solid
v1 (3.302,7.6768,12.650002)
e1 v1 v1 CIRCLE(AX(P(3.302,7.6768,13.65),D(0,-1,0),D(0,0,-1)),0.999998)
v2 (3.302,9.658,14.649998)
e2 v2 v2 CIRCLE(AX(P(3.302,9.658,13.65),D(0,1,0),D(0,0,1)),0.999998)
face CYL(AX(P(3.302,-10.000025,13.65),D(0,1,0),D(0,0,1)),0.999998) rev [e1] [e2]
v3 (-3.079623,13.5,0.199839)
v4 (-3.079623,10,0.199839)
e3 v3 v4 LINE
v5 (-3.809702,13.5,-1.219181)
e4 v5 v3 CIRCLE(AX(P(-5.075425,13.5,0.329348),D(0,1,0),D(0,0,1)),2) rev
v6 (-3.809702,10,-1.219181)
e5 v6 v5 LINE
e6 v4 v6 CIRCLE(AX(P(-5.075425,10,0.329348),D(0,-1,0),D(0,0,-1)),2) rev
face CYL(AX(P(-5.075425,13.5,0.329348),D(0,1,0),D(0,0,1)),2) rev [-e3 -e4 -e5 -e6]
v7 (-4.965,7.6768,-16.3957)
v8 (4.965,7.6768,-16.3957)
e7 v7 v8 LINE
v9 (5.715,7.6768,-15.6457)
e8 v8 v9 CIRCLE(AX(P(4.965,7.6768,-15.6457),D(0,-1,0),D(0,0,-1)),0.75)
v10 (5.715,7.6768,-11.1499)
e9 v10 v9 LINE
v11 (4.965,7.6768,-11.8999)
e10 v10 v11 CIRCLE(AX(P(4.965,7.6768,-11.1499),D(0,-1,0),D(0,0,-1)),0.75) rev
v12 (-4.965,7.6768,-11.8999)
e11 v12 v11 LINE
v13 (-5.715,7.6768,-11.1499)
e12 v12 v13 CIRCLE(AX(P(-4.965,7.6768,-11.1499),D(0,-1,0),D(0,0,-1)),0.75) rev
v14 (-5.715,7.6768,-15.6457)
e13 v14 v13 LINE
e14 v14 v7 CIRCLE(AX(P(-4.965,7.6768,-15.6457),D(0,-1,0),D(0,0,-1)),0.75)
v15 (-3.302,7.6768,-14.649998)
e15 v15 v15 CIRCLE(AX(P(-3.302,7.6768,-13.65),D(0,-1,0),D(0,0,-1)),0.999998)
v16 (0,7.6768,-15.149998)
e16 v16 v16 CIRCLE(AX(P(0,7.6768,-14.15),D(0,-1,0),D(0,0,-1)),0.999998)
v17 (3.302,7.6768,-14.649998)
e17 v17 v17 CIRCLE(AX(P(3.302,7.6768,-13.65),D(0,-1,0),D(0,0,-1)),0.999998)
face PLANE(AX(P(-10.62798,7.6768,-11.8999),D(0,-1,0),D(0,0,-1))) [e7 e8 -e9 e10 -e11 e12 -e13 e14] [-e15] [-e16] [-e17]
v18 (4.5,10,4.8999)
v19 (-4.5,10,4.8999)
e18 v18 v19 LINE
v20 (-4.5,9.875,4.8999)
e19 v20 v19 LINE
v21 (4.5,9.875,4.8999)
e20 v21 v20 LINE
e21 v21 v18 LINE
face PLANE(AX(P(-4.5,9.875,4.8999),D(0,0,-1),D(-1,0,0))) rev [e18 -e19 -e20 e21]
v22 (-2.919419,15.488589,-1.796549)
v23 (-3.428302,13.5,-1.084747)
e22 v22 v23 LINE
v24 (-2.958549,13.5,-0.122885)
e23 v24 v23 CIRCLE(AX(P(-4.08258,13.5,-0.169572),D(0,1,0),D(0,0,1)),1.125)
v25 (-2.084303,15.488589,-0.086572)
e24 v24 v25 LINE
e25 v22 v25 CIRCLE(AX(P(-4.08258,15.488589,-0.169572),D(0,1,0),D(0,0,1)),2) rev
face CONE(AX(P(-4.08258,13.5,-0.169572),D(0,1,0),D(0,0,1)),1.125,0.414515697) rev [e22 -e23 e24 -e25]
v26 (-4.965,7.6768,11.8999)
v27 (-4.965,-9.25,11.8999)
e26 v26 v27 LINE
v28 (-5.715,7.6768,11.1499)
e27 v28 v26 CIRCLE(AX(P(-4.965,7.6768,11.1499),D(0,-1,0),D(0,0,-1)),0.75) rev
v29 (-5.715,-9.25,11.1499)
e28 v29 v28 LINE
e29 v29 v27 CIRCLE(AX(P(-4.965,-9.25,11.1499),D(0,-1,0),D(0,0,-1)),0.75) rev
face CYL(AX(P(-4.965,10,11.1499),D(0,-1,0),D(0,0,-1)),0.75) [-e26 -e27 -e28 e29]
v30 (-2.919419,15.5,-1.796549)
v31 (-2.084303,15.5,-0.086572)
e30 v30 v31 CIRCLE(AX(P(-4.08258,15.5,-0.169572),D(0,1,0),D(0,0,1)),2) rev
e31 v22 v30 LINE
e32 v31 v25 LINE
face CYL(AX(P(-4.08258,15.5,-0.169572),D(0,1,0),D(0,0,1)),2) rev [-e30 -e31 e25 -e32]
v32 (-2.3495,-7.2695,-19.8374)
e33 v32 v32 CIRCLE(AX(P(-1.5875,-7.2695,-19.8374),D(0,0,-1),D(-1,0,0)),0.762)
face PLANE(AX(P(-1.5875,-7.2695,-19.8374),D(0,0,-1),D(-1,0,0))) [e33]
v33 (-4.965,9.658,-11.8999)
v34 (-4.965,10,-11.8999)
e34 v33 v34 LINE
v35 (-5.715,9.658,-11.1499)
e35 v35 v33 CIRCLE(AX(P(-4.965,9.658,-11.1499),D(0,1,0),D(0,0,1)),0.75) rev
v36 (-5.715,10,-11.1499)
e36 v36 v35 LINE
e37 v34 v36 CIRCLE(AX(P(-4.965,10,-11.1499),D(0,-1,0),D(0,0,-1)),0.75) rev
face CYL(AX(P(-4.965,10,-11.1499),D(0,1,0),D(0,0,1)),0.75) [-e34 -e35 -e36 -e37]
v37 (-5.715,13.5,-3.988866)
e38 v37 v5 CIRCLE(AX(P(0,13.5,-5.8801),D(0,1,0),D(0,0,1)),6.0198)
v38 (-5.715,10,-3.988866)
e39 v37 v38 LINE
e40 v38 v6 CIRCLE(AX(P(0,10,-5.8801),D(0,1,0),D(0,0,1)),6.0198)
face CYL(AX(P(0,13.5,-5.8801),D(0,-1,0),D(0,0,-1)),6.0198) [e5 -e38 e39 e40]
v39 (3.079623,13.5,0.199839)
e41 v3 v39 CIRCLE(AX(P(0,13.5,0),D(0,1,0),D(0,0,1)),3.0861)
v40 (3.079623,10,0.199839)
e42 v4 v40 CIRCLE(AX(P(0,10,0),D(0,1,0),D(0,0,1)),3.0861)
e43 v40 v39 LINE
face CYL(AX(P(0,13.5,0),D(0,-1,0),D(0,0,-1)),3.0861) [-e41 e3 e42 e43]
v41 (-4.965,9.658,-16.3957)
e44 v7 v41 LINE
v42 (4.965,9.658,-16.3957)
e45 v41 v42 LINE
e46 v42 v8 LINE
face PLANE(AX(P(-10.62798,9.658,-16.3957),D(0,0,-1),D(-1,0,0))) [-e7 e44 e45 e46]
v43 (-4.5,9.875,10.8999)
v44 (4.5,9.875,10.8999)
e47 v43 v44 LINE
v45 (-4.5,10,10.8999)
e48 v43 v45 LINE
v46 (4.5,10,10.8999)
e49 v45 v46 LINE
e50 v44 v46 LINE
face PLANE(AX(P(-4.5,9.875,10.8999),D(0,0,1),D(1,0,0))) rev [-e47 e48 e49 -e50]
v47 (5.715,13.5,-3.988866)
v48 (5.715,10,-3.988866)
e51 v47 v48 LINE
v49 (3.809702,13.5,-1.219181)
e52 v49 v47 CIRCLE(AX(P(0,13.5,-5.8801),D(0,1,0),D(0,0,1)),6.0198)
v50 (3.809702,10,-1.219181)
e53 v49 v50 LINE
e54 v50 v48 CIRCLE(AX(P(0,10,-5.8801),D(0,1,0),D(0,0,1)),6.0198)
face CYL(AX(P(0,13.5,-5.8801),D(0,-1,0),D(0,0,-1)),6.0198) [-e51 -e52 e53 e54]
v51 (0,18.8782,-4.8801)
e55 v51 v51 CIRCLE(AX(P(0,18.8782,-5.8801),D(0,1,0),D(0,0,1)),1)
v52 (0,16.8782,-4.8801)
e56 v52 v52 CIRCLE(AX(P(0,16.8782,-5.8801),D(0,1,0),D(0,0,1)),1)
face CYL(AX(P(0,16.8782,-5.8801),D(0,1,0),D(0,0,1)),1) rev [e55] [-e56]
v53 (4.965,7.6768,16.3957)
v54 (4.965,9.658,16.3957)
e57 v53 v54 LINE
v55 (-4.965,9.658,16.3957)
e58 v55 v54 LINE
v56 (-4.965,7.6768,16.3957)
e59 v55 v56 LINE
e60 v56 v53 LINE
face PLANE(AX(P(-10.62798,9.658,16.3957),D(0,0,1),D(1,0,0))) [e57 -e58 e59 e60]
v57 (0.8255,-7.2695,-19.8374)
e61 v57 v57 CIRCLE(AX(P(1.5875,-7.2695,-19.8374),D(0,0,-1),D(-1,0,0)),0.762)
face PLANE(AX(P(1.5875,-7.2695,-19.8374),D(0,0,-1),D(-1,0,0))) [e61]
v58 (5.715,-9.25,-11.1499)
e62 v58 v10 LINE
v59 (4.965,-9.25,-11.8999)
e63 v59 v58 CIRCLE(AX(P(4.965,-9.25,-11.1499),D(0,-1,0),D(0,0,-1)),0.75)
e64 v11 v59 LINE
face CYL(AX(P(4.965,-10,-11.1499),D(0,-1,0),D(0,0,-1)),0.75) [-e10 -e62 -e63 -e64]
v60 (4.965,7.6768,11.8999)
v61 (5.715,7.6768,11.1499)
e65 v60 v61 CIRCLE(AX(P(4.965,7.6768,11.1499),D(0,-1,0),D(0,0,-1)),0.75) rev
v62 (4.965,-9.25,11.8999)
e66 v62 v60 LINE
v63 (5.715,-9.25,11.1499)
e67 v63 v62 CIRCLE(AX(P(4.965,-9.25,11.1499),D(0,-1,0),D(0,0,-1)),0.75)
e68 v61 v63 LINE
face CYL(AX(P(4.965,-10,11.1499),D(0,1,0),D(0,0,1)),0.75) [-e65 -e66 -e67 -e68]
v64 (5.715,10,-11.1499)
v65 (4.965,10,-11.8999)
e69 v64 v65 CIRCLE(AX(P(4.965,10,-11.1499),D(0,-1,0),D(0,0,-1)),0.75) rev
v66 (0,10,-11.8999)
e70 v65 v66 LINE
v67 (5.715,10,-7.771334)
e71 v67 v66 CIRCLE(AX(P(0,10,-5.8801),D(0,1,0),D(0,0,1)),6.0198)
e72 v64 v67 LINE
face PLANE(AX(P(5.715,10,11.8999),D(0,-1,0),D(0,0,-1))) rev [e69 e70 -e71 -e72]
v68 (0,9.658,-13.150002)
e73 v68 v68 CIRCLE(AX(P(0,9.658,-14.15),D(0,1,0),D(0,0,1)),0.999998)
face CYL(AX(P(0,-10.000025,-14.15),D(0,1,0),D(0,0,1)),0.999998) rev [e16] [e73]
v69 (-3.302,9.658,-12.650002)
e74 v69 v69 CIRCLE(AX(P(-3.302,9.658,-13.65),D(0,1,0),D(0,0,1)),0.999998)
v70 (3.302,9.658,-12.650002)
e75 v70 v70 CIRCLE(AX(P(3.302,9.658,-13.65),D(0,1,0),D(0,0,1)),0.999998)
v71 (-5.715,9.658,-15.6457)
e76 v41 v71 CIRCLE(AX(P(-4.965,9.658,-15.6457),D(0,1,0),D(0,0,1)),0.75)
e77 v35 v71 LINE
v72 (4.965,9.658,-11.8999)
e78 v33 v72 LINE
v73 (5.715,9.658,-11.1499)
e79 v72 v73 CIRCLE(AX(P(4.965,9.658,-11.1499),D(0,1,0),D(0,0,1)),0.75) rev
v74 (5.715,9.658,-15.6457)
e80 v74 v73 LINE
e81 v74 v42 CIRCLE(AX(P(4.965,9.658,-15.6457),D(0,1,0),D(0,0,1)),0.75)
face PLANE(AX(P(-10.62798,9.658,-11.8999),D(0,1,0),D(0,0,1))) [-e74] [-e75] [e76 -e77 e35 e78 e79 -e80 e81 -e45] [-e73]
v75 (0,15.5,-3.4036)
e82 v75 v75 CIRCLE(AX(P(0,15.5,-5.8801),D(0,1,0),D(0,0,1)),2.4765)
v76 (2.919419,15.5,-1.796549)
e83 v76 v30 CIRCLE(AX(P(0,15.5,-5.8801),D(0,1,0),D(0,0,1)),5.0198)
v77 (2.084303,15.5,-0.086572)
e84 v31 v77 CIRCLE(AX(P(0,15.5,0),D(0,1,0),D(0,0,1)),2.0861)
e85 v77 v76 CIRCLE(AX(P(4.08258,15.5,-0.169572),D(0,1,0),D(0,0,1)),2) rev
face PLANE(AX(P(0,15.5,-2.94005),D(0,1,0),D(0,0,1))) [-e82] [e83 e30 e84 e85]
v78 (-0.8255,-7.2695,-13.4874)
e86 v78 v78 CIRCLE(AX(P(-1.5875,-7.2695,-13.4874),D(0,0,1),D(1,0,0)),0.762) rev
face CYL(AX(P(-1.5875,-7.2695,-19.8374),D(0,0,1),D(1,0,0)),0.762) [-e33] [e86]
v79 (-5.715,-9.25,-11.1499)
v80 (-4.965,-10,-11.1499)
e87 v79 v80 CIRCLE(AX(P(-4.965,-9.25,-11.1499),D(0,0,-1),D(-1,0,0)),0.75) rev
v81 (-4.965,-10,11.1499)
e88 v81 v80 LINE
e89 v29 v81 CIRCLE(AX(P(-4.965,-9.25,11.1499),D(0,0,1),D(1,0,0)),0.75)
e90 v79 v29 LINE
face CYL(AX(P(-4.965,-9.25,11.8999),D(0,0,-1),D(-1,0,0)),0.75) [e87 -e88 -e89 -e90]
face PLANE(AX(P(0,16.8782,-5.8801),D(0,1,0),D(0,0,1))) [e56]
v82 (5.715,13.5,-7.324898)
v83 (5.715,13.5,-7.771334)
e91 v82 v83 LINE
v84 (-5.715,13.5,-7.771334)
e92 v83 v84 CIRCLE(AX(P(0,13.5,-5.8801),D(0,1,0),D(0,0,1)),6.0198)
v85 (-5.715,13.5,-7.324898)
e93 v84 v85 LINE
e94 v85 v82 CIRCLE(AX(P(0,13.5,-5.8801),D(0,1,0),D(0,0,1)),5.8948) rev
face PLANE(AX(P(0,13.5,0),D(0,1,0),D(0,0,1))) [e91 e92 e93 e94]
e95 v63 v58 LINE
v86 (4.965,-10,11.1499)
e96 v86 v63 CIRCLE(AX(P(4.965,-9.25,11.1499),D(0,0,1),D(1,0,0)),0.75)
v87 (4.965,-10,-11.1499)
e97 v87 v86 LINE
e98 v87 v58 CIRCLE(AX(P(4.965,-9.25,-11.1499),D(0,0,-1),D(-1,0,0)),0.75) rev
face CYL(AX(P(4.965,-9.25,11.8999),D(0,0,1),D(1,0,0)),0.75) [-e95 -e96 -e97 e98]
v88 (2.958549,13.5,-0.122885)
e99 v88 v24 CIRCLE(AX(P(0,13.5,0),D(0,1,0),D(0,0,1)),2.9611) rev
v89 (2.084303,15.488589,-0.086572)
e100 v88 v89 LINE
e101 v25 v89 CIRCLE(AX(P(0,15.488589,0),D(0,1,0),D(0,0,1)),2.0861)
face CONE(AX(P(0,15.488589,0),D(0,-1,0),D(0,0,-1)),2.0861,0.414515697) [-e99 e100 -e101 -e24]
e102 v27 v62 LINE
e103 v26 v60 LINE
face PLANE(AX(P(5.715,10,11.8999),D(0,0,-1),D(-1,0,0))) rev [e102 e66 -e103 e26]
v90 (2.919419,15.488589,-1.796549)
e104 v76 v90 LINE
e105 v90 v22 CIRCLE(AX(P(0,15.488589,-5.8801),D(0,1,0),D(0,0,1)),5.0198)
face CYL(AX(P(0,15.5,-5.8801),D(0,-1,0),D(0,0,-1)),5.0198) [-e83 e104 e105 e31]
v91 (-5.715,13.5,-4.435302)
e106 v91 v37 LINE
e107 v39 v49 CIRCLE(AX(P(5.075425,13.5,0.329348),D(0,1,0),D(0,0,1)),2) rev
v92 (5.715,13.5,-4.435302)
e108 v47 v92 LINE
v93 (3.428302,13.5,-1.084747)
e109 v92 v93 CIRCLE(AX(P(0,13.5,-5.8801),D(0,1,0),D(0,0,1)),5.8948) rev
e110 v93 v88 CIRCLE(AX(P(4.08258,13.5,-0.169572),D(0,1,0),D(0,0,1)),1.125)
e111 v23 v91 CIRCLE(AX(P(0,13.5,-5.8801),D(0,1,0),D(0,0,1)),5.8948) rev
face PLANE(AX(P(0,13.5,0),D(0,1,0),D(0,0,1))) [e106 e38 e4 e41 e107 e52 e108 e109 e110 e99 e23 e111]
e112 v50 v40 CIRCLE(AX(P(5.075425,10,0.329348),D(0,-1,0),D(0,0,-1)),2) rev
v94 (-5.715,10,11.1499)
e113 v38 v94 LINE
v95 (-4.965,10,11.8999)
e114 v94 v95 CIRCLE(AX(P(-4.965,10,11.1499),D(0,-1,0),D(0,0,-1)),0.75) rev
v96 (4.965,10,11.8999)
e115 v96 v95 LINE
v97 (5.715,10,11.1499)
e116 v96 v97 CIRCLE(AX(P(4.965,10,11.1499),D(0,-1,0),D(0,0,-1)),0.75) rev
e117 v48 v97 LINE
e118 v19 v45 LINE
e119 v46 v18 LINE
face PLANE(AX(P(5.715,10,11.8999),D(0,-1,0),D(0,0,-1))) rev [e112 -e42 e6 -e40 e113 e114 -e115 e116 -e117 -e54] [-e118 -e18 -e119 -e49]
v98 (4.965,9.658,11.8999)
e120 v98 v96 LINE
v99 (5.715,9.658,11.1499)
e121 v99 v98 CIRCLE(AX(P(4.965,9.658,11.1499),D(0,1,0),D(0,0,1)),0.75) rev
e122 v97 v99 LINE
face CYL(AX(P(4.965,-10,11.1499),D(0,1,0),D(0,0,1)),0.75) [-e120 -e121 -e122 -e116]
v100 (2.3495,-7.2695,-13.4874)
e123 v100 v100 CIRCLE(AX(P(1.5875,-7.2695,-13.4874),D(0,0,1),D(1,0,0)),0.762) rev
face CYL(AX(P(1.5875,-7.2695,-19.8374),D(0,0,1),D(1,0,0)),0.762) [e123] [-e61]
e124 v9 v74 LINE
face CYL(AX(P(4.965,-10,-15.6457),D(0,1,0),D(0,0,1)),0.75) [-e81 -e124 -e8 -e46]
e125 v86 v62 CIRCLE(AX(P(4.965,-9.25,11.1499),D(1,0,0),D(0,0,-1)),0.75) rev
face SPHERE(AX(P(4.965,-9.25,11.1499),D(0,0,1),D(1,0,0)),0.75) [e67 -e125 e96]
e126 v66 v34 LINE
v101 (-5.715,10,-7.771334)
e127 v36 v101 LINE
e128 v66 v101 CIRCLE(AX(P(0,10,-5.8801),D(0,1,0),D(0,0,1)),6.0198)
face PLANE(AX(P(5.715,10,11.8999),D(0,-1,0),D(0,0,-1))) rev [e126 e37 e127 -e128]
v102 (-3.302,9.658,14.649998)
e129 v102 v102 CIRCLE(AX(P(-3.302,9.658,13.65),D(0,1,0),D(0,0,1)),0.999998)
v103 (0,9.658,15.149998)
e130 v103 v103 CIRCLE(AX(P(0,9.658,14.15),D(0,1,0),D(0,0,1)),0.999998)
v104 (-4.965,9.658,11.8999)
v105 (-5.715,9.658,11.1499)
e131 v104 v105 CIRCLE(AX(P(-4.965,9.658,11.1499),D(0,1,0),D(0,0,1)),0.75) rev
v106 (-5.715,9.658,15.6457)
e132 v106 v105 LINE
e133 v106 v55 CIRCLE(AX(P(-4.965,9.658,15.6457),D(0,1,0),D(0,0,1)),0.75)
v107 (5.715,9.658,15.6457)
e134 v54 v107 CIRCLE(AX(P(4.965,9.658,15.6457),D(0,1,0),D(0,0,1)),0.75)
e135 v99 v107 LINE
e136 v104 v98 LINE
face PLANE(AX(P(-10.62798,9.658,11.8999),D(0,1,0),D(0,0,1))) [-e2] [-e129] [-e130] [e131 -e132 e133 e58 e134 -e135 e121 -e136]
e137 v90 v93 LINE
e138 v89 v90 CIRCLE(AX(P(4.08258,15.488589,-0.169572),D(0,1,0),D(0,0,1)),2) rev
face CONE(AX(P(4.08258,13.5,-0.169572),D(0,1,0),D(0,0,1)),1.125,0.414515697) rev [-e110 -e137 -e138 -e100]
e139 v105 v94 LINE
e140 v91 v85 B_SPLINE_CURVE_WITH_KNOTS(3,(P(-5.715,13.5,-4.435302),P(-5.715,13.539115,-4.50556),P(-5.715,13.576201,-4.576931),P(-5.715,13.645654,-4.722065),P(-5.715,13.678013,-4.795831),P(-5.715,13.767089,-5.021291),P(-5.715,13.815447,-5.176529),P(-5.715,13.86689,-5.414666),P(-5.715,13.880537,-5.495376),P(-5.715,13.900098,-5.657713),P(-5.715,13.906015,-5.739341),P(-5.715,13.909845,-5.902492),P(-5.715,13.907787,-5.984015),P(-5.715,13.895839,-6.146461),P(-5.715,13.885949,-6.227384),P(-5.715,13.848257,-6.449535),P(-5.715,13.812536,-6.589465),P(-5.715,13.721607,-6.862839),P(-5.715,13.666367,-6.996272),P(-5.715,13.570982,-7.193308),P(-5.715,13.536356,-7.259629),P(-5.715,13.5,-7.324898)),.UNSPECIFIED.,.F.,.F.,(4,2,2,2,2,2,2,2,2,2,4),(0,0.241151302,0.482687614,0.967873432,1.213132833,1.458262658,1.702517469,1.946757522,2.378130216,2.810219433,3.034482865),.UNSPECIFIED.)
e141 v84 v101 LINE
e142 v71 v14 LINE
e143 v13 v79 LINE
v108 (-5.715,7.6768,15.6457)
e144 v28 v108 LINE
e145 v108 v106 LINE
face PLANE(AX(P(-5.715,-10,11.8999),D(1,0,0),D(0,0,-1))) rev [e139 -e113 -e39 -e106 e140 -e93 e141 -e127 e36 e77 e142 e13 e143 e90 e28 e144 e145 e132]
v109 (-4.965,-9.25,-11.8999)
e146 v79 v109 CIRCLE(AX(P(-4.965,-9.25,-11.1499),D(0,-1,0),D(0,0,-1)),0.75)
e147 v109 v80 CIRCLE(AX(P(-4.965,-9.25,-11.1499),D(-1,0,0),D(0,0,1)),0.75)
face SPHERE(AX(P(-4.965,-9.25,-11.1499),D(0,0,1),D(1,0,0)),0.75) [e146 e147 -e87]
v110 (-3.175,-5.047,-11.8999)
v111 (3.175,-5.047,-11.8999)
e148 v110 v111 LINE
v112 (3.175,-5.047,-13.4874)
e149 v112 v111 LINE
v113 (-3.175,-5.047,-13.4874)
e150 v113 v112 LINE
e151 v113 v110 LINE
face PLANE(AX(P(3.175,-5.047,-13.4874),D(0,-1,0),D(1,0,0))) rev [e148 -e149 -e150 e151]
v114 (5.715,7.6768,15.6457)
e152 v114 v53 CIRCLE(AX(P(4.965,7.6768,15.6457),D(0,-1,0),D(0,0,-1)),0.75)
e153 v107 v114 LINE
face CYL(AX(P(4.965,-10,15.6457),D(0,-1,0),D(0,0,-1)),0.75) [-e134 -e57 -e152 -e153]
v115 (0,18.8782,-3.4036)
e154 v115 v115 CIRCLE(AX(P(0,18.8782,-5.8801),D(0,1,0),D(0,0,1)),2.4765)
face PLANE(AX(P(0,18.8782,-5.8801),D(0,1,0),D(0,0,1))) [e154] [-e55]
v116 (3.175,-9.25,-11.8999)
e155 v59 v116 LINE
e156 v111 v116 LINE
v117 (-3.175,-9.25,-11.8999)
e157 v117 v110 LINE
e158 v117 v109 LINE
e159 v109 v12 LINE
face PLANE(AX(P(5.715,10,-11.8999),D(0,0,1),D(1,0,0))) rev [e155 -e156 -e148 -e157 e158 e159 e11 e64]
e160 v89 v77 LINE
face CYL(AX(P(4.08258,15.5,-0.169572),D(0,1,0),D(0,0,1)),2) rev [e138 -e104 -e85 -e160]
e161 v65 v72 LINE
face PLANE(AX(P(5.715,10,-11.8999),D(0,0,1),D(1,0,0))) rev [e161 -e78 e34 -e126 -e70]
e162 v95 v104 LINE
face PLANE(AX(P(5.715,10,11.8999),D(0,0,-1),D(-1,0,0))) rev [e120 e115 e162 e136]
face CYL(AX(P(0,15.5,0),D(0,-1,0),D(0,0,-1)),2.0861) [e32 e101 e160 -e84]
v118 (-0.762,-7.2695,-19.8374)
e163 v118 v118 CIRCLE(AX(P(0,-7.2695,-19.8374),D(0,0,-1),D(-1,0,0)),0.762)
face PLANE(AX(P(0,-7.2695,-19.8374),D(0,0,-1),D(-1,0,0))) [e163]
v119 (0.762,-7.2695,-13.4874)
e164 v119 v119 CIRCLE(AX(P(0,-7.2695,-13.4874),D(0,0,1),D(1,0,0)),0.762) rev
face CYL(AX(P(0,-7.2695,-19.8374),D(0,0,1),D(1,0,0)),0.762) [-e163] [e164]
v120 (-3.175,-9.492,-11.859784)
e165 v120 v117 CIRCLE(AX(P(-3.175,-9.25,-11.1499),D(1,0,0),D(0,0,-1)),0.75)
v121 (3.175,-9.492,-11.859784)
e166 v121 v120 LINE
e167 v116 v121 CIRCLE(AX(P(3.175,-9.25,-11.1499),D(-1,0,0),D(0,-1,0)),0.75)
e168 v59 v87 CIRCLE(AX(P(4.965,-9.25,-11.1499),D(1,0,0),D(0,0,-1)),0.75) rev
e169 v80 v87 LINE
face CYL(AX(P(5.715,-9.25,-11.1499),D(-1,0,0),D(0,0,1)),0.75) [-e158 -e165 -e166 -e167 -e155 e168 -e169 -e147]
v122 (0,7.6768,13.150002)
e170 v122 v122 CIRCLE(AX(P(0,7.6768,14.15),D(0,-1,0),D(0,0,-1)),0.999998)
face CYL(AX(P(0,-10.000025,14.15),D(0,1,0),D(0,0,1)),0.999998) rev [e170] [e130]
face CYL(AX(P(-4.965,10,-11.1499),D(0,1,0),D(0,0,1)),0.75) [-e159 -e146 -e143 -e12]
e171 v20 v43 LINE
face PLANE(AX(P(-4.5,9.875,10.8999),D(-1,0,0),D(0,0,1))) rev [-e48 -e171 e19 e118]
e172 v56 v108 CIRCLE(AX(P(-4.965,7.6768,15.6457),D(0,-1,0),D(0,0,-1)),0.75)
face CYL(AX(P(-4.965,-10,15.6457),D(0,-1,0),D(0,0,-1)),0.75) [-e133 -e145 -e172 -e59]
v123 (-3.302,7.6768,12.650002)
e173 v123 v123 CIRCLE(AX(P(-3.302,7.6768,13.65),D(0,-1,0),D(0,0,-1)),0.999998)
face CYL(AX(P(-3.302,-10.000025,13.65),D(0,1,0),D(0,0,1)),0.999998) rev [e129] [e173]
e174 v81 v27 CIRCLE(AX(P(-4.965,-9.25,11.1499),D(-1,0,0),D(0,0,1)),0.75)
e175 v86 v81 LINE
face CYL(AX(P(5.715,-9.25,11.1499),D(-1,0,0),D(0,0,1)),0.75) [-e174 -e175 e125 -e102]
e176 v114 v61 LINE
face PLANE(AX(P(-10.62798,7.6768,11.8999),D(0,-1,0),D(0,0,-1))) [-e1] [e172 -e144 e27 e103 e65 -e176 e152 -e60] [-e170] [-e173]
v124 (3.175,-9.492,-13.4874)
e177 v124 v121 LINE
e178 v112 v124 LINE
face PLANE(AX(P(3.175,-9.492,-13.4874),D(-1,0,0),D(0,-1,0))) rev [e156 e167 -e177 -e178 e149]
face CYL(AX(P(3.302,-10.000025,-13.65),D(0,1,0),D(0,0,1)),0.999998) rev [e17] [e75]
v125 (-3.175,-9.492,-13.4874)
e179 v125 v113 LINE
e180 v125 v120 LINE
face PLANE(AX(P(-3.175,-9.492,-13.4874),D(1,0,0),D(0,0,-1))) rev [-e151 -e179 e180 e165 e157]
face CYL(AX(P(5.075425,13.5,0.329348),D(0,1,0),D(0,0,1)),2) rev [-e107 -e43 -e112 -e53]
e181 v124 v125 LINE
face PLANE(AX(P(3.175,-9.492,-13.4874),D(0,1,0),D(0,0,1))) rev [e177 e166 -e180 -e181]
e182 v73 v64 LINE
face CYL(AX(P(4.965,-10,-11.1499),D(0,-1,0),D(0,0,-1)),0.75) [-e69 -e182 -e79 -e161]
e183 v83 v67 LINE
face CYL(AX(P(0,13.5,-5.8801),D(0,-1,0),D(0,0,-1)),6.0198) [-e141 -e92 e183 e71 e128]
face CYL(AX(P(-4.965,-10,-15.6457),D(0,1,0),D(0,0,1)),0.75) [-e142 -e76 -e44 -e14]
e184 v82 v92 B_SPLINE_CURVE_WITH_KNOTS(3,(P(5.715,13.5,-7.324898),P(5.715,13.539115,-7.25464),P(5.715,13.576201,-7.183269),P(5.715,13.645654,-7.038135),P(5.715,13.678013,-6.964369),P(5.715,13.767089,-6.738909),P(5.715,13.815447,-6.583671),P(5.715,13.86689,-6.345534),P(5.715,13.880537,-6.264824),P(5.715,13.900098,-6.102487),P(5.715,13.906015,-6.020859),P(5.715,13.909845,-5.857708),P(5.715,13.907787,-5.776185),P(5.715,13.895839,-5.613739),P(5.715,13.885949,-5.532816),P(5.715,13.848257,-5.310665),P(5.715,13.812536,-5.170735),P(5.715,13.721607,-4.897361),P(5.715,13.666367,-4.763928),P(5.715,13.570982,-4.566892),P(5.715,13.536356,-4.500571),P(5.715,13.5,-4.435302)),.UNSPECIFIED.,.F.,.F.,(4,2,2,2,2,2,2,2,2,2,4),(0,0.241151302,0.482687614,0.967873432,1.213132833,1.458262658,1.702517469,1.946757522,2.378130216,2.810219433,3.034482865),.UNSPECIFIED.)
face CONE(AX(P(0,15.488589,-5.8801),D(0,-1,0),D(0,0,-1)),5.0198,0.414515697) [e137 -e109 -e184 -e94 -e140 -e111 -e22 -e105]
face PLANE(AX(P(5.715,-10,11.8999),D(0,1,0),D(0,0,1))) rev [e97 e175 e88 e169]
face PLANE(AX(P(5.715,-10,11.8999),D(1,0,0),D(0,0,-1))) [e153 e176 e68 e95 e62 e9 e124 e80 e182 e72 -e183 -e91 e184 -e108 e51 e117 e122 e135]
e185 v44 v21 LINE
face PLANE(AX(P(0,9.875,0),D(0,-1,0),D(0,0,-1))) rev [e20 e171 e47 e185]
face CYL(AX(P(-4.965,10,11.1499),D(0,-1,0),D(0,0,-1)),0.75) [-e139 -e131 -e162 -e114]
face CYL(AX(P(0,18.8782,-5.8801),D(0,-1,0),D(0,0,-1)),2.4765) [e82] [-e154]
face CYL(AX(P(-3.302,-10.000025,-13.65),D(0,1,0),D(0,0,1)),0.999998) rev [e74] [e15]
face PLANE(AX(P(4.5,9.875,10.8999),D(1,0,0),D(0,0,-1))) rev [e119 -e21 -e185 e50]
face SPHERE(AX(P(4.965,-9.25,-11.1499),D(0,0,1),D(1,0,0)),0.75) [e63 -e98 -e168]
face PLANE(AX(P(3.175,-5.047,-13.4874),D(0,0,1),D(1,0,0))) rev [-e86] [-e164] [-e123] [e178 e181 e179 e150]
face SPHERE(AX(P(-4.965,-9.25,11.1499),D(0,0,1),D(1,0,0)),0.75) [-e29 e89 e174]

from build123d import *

# Parameters (mm, degrees)
EXTRUDE1_DEPTH      = 5.715
EXTRUDE1_DEPTH_BACK = 5.715
SKETCH1_W           = 23.7998
SKETCH1_H           = 20
BOSS_EXTRUDE7_DEPTH = 3.5
BOSS_EXTRUDE8_DEPTH = 2
SKETCH3_W           = 4.4958
SKETCH3_H           = 1.9812
EXTRUDE2_DEPTH      = 11.43
SKETCH4_R           = 0.999998
EXTRUDE3_DEPTH      = 27.22817507
SKETCH5_W           = 6.35
SKETCH5_H           = 4.445
BOSS_EXTRUDE1_DEPTH = 1.5875
SKETCH6_R           = 0.762
BOSS_EXTRUDE4_DEPTH = 6.35
SKETCH8_R           = 2.4765
BOSS_EXTRUDE6_DEPTH = 3.3782
SKETCH9_W           = 9
SKETCH9_H           = 6
CUT_EXTRUDE2_DEPTH  = 0.125
SKETCH11_R          = 1
CUT_EXTRUDE3_DEPTH  = 2
FILLET1_R           = 0.75
FILLET2_R           = 2
CHAMFER1_SIZE       = 0.875
CHAMFER1_SIZE_2     = 1.988588769


with BuildPart() as part:
    # Sketch1 → Extrude1 (new, two sides: drawn at the far end of the back side and taken through both)
    with BuildSketch(Plane(origin=(0, 0, 0), x_dir=(0, 0, -1), z_dir=(1, 0, 0)).offset(-EXTRUDE1_DEPTH_BACK)):
        Rectangle(SKETCH1_W, SKETCH1_H)
    extrude(amount=EXTRUDE1_DEPTH + EXTRUDE1_DEPTH_BACK)

    # Sketch2 → Boss-Extrude7 (add)
    with BuildSketch(Plane(origin=(0, 10, 0), x_dir=(-1, 0, 0), z_dir=(0, 1, 0))):
        with BuildLine():
            Line((5.715, -7.771334264), (5.715, -3.988865736))
            ThreePointArc((5.715, -3.988865736), (4.669043342, -2.080359705), (3.012827896, -0.668491793))
            ThreePointArc((3.012827896, -0.668491793), (0, 3.0861), (-3.012827896, -0.668491793))
            ThreePointArc((-3.012827896, -0.668491793), (-4.669043342, -2.080359705), (-5.715, -3.988865736))
            Line((-5.715, -3.988865736), (-5.715, -7.771334264))
            ThreePointArc((-5.715, -7.771334264), (0, -11.8999), (5.715, -7.771334264))
        make_face()
    extrude(amount=BOSS_EXTRUDE7_DEPTH)

    # Sketch10 → Boss-Extrude8 (add)
    with BuildSketch(Plane(origin=(0, 13.5, 0), x_dir=(1, 0, 0), z_dir=(0, 1, 0))):
        with BuildLine():
            ThreePointArc((-1.728861682, 1.167411879), (0, -2.0861), (1.728861682, 1.167411879))
            ThreePointArc((1.728861682, 1.167411879), (0, 10.8999), (-1.728861682, 1.167411879))
        make_face()
    extrude(amount=BOSS_EXTRUDE8_DEPTH)

    # Sketch3 → Extrude2 (add)
    with BuildSketch(Plane(origin=(5.715, 0, 0), x_dir=(0, 0, -1), z_dir=(1, 0, 0))):
        with Locations((-14.1478, 8.6674)):
            Rectangle(SKETCH3_W, SKETCH3_H)
        with Locations((14.1478, 8.6674)):
            Rectangle(SKETCH3_W, SKETCH3_H)
    extrude(amount=-EXTRUDE2_DEPTH)

    # Sketch4 → Extrude3 (cut, through all)
    with BuildSketch(Plane(origin=(0, 9.658, 0), x_dir=(1, 0, 0), z_dir=(0, 1, 0))):
        with Locations(Location((0, 14.15, 0), (0, 0, 270))):
            Circle(SKETCH4_R)
        with Locations(Location((0, -14.15, 0), (0, 0, 270))):
            Circle(SKETCH4_R)
        with Locations(Location((-3.302, 13.65, 0), (0, 0, 270))):
            Circle(SKETCH4_R)
        with Locations(Location((3.302, 13.65, 0), (0, 0, 270))):
            Circle(SKETCH4_R)
        with Locations(Location((3.302, -13.65, 0), (0, 0, 270))):
            Circle(SKETCH4_R)
        with Locations(Location((-3.302, -13.65, 0), (0, 0, 270))):
            Circle(SKETCH4_R)
    extrude(amount=-EXTRUDE3_DEPTH, mode=Mode.SUBTRACT)

    # Sketch5 → Boss-Extrude1 (add)
    with BuildSketch(Plane(origin=(0, 0, -11.8999), x_dir=(-1, 0, 0), z_dir=(0, 0, -1))):
        with Locations((0, -7.2695)):
            Rectangle(SKETCH5_W, SKETCH5_H)
    extrude(amount=BOSS_EXTRUDE1_DEPTH)

    # Sketch6 → Boss-Extrude4 (add)
    with BuildSketch(Plane(origin=(0, 0, -13.4874), x_dir=(-1, 0, 0), z_dir=(0, 0, -1))):
        with Locations(Location((0, -7.2695, 0), (0, 0, 180))):
            Circle(SKETCH6_R)
        with Locations(Location((-1.5875, -7.2695, 0), (0, 0, 180))):
            Circle(SKETCH6_R)
        with Locations(Location((1.5875, -7.2695, 0), (0, 0, 180))):
            Circle(SKETCH6_R)
    extrude(amount=BOSS_EXTRUDE4_DEPTH)

    # Sketch8 → Boss-Extrude6 (add)
    with BuildSketch(Plane(origin=(0, 15.5, 0), x_dir=(1, 0, 0), z_dir=(0, 1, 0))):
        with Locations(Location((0, 5.8801, 0), (0, 0, 270))):
            Circle(SKETCH8_R)
    extrude(amount=BOSS_EXTRUDE6_DEPTH)

    # Sketch9 → Cut-Extrude2 (cut)
    with BuildSketch(Plane(origin=(0, 10, 0), x_dir=(1, 0, 0), z_dir=(0, 1, 0))):
        with Locations((0, -7.8999)):
            Rectangle(SKETCH9_W, SKETCH9_H)
    extrude(amount=-CUT_EXTRUDE2_DEPTH, mode=Mode.SUBTRACT)

    # Sketch11 → Cut-Extrude3 (cut)
    with BuildSketch(Plane(origin=(0, 18.8782, 0), x_dir=(1, 0, 0), z_dir=(0, 1, 0))):
        with Locations(Location((0, 5.8801, 0), (0, 0, 270))):
            Circle(SKETCH11_R)
    extrude(amount=-CUT_EXTRUDE3_DEPTH, mode=Mode.SUBTRACT)

    # Fillet1
    # the kernel refuses this fillet: 0.75 mm, written as the material it takes off along each edge
    with BuildSketch(Plane(origin=(-4.965, -9.25, 11.1499), x_dir=(0, -1, 0), z_dir=(-1, 0, 0))) as fillet1_piece_1_section:
        Polygon((0, 0), (FILLET1_R, 0), (FILLET1_R, FILLET1_R), (0, FILLET1_R), align=None)
    fillet1_piece_1 = extrude(amount=FILLET1_R, mode=Mode.PRIVATE)
    fillet1_piece_1 = fillet1_piece_1 - Plane(origin=(-4.965, -9.25, 11.1499), x_dir=(0, 0.7071067811865475, -0.7071067811865475), z_dir=(-1, 0, 0)) * Sphere(FILLET1_R, mode=Mode.PRIVATE)
    add(fillet1_piece_1, mode=Mode.SUBTRACT)
    with BuildSketch(Plane(origin=(-4.965, -9.25, -11.1499), x_dir=(0, 0, -1), z_dir=(-1, 0, 0))) as fillet1_piece_2_section:
        Polygon((0, 0), (FILLET1_R, 0), (FILLET1_R, FILLET1_R), (0, FILLET1_R), align=None)
    fillet1_piece_2 = extrude(amount=FILLET1_R, mode=Mode.PRIVATE)
    fillet1_piece_2 = fillet1_piece_2 - Plane(origin=(-4.965, -9.25, -11.1499), x_dir=(0, 0.7071067811865475, 0.7071067811865475), z_dir=(-1, 0, 0)) * Sphere(FILLET1_R, mode=Mode.PRIVATE)
    add(fillet1_piece_2, mode=Mode.SUBTRACT)
    with BuildSketch(Plane(origin=(4.965, -9.25, 11.1499), x_dir=(0, -1, 0), z_dir=(1, 0, 0))) as fillet1_piece_3_section:
        Polygon((0, 0), (FILLET1_R, 0), (FILLET1_R, -FILLET1_R), (0, -FILLET1_R), align=None)
    fillet1_piece_3 = extrude(amount=FILLET1_R, mode=Mode.PRIVATE)
    fillet1_piece_3 = fillet1_piece_3 - Plane(origin=(4.965, -9.25, 11.1499), x_dir=(0, 0.7071067811865475, -0.7071067811865475), z_dir=(1, 0, 0)) * Sphere(FILLET1_R, mode=Mode.PRIVATE)
    add(fillet1_piece_3, mode=Mode.SUBTRACT)
    with BuildSketch(Plane(origin=(4.965, -9.25, -11.1499), x_dir=(0, 0, -1), z_dir=(1, 0, 0))) as fillet1_piece_4_section:
        Polygon((0, 0), (FILLET1_R, 0), (FILLET1_R, -FILLET1_R), (0, -FILLET1_R), align=None)
    fillet1_piece_4 = extrude(amount=FILLET1_R, mode=Mode.PRIVATE)
    fillet1_piece_4 = fillet1_piece_4 - Plane(origin=(4.965, -9.25, -11.1499), x_dir=(0, 0.7071067811865475, 0.7071067811865475), z_dir=(1, 0, 0)) * Sphere(FILLET1_R, mode=Mode.PRIVATE)
    add(fillet1_piece_4, mode=Mode.SUBTRACT)
    with BuildSketch(Plane(origin=(-5.715, -9.25, 11.8999), x_dir=(0, 0, -1), z_dir=(0, 1, 0)), Plane(origin=(-5.715, 7.6768, -11.8999), x_dir=(0, 0, 1), z_dir=(0, -1, 0))) as fillet1_piece_5:
        with BuildLine():
            CenterArc((FILLET1_R, -FILLET1_R), FILLET1_R, 90, 90)
            Line((0, -FILLET1_R), (0, 0))
            Line((0, 0), (FILLET1_R, 0))
        make_face()
    extrude(amount=16.9268, mode=Mode.SUBTRACT)
    with BuildSketch(Plane(origin=(-5.715, 11.533, -16.3957), x_dir=(0, 0, 1), z_dir=(0, -1, 0)), Plane(origin=(5.715, 11.533, 16.3957), x_dir=(0, 0, -1), z_dir=(0, -1, 0))) as fillet1_piece_6:
        with BuildLine():
            CenterArc((FILLET1_R, -FILLET1_R), FILLET1_R, 90, 90)
            Line((0, -FILLET1_R), (0, 0))
            Line((0, 0), (FILLET1_R, 0))
        make_face()
    extrude(amount=5.7312, mode=Mode.SUBTRACT)
    with BuildSketch(Plane(origin=(5.715, 11.533, -16.3957), x_dir=(0, 0, 1), z_dir=(0, -1, 0)), Plane(origin=(-5.715, 11.533, 16.3957), x_dir=(0, 0, -1), z_dir=(0, -1, 0))) as fillet1_piece_7:
        with BuildLine():
            CenterArc((FILLET1_R, FILLET1_R), FILLET1_R, 180, 90)
            Line((0, FILLET1_R), (0, 0))
            Line((0, 0), (FILLET1_R, 0))
        make_face()
    extrude(amount=5.7312, mode=Mode.SUBTRACT)
    with BuildSketch(Plane(origin=(-5.715, 11.875, -11.8999), x_dir=(0, 0, 1), z_dir=(0, -1, 0)), Plane(origin=(5.715, 9.658, 11.8999), x_dir=(-1, 0, 0), z_dir=(0, 1, 0))) as fillet1_piece_8:
        with BuildLine():
            CenterArc((FILLET1_R, -FILLET1_R), FILLET1_R, 90, 90)
            Line((0, -FILLET1_R), (0, 0))
            Line((0, 0), (FILLET1_R, 0))
        make_face()
    extrude(amount=2.217, mode=Mode.SUBTRACT)
    with BuildSketch(Plane(origin=(5.715, 11.875, -11.8999), x_dir=(0, 0, 1), z_dir=(0, -1, 0)), Plane(origin=(-5.715, 9.658, 11.8999), x_dir=(1, 0, 0), z_dir=(0, 1, 0))) as fillet1_piece_9:
        with BuildLine():
            CenterArc((FILLET1_R, FILLET1_R), FILLET1_R, 180, 90)
            Line((0, FILLET1_R), (0, 0))
            Line((0, 0), (FILLET1_R, 0))
        make_face()
    extrude(amount=2.217, mode=Mode.SUBTRACT)
    with BuildSketch(Plane(origin=(-4.965, -10, 11.8999), x_dir=(0, 0, -1), z_dir=(1, 0, 0))) as fillet1_piece_10:
        with BuildLine():
            CenterArc((FILLET1_R, FILLET1_R), FILLET1_R, 180, 90)
            Line((0, FILLET1_R), (0, 0))
            Line((0, 0), (FILLET1_R, 0))
        make_face()
    extrude(amount=9.93, mode=Mode.SUBTRACT)
    with BuildSketch(Plane(origin=(4.965, -10, -11.8999), x_dir=(0, 1, 0), z_dir=(-1, 0, 0))) as fillet1_piece_11_section:
        with BuildLine():
            CenterArc((FILLET1_R, -FILLET1_R), FILLET1_R, 90, 90)
            Line((0, -FILLET1_R), (0, 0))
            Line((0, 0), (FILLET1_R, 0))
        make_face()
    fillet1_piece_11 = extrude(amount=9.93, mode=Mode.PRIVATE)
    fillet1_piece_11 = split(fillet1_piece_11, bisect_by=Plane(origin=(4.965, -9.492, -11.8999), z_dir=(0, 1, 0)), keep=Keep.TOP, mode=Mode.PRIVATE)
    fillet1_piece_11 = split(fillet1_piece_11, bisect_by=Plane(origin=(3.175, -10, -11.8999), z_dir=(1, 0, 0)), keep=Keep.TOP, mode=Mode.PRIVATE)
    add(fillet1_piece_11, mode=Mode.SUBTRACT)
    with BuildSketch(Plane(origin=(4.965, -10, -11.8999), x_dir=(0, 1, 0), z_dir=(-1, 0, 0))) as fillet1_piece_12_section:
        with BuildLine():
            CenterArc((FILLET1_R, -FILLET1_R), FILLET1_R, 90, 90)
            Line((0, -FILLET1_R), (0, 0))
            Line((0, 0), (FILLET1_R, 0))
        make_face()
    fillet1_piece_12 = extrude(amount=9.93, mode=Mode.PRIVATE)
    fillet1_piece_12 = split(fillet1_piece_12, bisect_by=Plane(origin=(4.965, -9.492, -11.8999), z_dir=(0, -1, 0)), keep=Keep.TOP, mode=Mode.PRIVATE)
    fillet1_piece_12 = split(fillet1_piece_12, bisect_by=Plane(origin=(3.175, -10, -11.8999), z_dir=(1, 0, 0)), keep=Keep.TOP, mode=Mode.PRIVATE)
    add(fillet1_piece_12, mode=Mode.SUBTRACT)
    with BuildSketch(Plane(origin=(4.965, -10, -11.8999), x_dir=(0, 1, 0), z_dir=(-1, 0, 0))) as fillet1_piece_13_section:
        with BuildLine():
            CenterArc((FILLET1_R, -FILLET1_R), FILLET1_R, 90, 90)
            Line((0, -FILLET1_R), (0, 0))
            Line((0, 0), (FILLET1_R, 0))
        make_face()
    fillet1_piece_13 = extrude(amount=9.93, mode=Mode.PRIVATE)
    fillet1_piece_13 = split(fillet1_piece_13, bisect_by=Plane(origin=(4.965, -9.492, -11.8999), z_dir=(0, -1, 0)), keep=Keep.TOP, mode=Mode.PRIVATE)
    fillet1_piece_13 = split(fillet1_piece_13, bisect_by=Plane(origin=(-3.175, -10, -11.8999), z_dir=(1, 0, 0)), keep=Keep.TOP, mode=Mode.PRIVATE)
    fillet1_piece_13 = split(fillet1_piece_13, bisect_by=Plane(origin=(3.175, -10, -11.8999), z_dir=(-1, 0, 0)), keep=Keep.TOP, mode=Mode.PRIVATE)
    add(fillet1_piece_13, mode=Mode.SUBTRACT)
    with BuildSketch(Plane(origin=(4.965, -10, -11.8999), x_dir=(0, 1, 0), z_dir=(-1, 0, 0))) as fillet1_piece_14_section:
        with BuildLine():
            CenterArc((FILLET1_R, -FILLET1_R), FILLET1_R, 90, 90)
            Line((0, -FILLET1_R), (0, 0))
            Line((0, 0), (FILLET1_R, 0))
        make_face()
    fillet1_piece_14 = extrude(amount=9.93, mode=Mode.PRIVATE)
    fillet1_piece_14 = split(fillet1_piece_14, bisect_by=Plane(origin=(4.965, -9.492, -11.8999), z_dir=(0, 1, 0)), keep=Keep.TOP, mode=Mode.PRIVATE)
    fillet1_piece_14 = split(fillet1_piece_14, bisect_by=Plane(origin=(-3.175, -10, -11.8999), z_dir=(-1, 0, 0)), keep=Keep.TOP, mode=Mode.PRIVATE)
    add(fillet1_piece_14, mode=Mode.SUBTRACT)
    with BuildSketch(Plane(origin=(4.965, -10, -11.8999), x_dir=(0, 1, 0), z_dir=(-1, 0, 0))) as fillet1_piece_15_section:
        with BuildLine():
            CenterArc((FILLET1_R, -FILLET1_R), FILLET1_R, 90, 90)
            Line((0, -FILLET1_R), (0, 0))
            Line((0, 0), (FILLET1_R, 0))
        make_face()
    fillet1_piece_15 = extrude(amount=9.93, mode=Mode.PRIVATE)
    fillet1_piece_15 = split(fillet1_piece_15, bisect_by=Plane(origin=(4.965, -9.492, -11.8999), z_dir=(0, -1, 0)), keep=Keep.TOP, mode=Mode.PRIVATE)
    fillet1_piece_15 = split(fillet1_piece_15, bisect_by=Plane(origin=(-3.175, -10, -11.8999), z_dir=(-1, 0, 0)), keep=Keep.TOP, mode=Mode.PRIVATE)
    add(fillet1_piece_15, mode=Mode.SUBTRACT)
    with BuildSketch(Plane(origin=(-5.715, -10, -11.1499), x_dir=(0, 1, 0), z_dir=(0, 0, 1))) as fillet1_piece_16:
        with BuildLine():
            CenterArc((FILLET1_R, -FILLET1_R), FILLET1_R, 90, 90)
            Line((0, -FILLET1_R), (0, 0))
            Line((0, 0), (FILLET1_R, 0))
        make_face()
    extrude(amount=22.2998, mode=Mode.SUBTRACT)
    with BuildSketch(Plane(origin=(5.715, -9.25, 11.8999), x_dir=(0, 0, -1), z_dir=(0, 1, 0)), Plane(origin=(5.715, 7.6768, -11.8999), x_dir=(0, 0, 1), z_dir=(0, -1, 0))) as fillet1_piece_17:
        with BuildLine():
            CenterArc((FILLET1_R, FILLET1_R), FILLET1_R, 180, 90)
            Line((0, FILLET1_R), (0, 0))
            Line((0, 0), (FILLET1_R, 0))
        make_face()
    extrude(amount=16.9268, mode=Mode.SUBTRACT)
    with BuildSketch(Plane(origin=(5.715, -10, -11.1499), x_dir=(0, 1, 0), z_dir=(0, 0, 1))) as fillet1_piece_18:
        with BuildLine():
            CenterArc((FILLET1_R, FILLET1_R), FILLET1_R, 180, 90)
            Line((0, FILLET1_R), (0, 0))
            Line((0, 0), (FILLET1_R, 0))
        make_face()
    extrude(amount=22.2998, mode=Mode.SUBTRACT)

    # Fillet2
    fillet2_edges = [part.edges().sort_by_distance(p)[0] for p in [
        (3.012827896, 11.75, -0.668491793),
        (-3.012827896, 11.75, -0.668491793),
        (-1.728861682, 14.5, -1.167411879),
        (1.728861682, 14.5, -1.167411879),
    ]]
    fillet(fillet2_edges, radius=FILLET2_R)

    # Chamfer1
    # the kernel refuses this chamfer: 1.988588769, 0.875 mm, written as the material it adds along each edge
    with BuildSketch(Plane(origin=(0, 13.5, -5.8801), x_dir=(0.5815806576828839, 0, 0.81348874522586), z_dir=(-0.81348874522586, 0, 0.5815806576828839))) as chamfer1_piece_1_section:
        Polygon((5.0198 + CHAMFER1_SIZE, 0), (5.0198, CHAMFER1_SIZE_2), (5.0198, 0), align=None)
    chamfer1_piece_1 = revolve(axis=Axis((0, 13.5, -5.8801), (0, 1, 0)), revolution_arc=288.87641071, mode=Mode.PRIVATE)
    chamfer1_piece_1 = split(chamfer1_piece_1, bisect_by=Plane(origin=(-5.715, 13.5, -5.8801), z_dir=(1, 0, 0)), keep=Keep.TOP, mode=Mode.PRIVATE)
    chamfer1_piece_1 = split(chamfer1_piece_1, bisect_by=Plane(origin=(5.715, 13.5, -5.8801), z_dir=(-1, 0, 0)), keep=Keep.TOP, mode=Mode.PRIVATE)
    add(chamfer1_piece_1)
    with BuildSketch(Plane(origin=(0, 13.5, 0), x_dir=(-0.9991385185879694, 0, -0.04149964667123892), z_dir=(0.04149964667123892, 0, -0.9991385185879694))) as chamfer1_piece_2:
        Polygon((2.0861 + CHAMFER1_SIZE, 0), (2.0861, CHAMFER1_SIZE_2), (2.0861, 0), align=None)
    revolve(axis=Axis((0, 13.5, 0), (0, 1, 0)), revolution_arc=184.756875276)
    with BuildSketch(Plane(origin=(-4.082579536, 13.5, -0.169571815), x_dir=(0.99913851602915, 0, 0.041499708276900374), z_dir=(-0.041499708276900374, 0, 0.99913851602915))) as chamfer1_piece_3:
        Polygon((1.99999964 - CHAMFER1_SIZE, 0), (1.99999964 - CHAMFER1_SIZE_2 * 7.6806587158e-09, CHAMFER1_SIZE_2), (1.99999964, 0), align=None)
    revolve(axis=Axis((-4.082579536, 13.5, -0.169571815), (0, 1, 0)), revolution_arc=56.816653232)
    with BuildSketch(Plane(origin=(4.082579536, 13.5, -0.169571815), x_dir=(-0.99913851602915, 0, 0.041499708276901796), z_dir=(0.041499708276901796, 0, 0.99913851602915))) as chamfer1_piece_4:
        Polygon((1.99999964 - CHAMFER1_SIZE, 0), (1.99999964 - CHAMFER1_SIZE_2 * 7.6806587158e-09, -CHAMFER1_SIZE_2), (1.99999964, 0), align=None)
    revolve(axis=Axis((4.082579536, 13.5, -0.169571815), (0, -1, 0)), revolution_arc=56.816653232)


solid = part.part
